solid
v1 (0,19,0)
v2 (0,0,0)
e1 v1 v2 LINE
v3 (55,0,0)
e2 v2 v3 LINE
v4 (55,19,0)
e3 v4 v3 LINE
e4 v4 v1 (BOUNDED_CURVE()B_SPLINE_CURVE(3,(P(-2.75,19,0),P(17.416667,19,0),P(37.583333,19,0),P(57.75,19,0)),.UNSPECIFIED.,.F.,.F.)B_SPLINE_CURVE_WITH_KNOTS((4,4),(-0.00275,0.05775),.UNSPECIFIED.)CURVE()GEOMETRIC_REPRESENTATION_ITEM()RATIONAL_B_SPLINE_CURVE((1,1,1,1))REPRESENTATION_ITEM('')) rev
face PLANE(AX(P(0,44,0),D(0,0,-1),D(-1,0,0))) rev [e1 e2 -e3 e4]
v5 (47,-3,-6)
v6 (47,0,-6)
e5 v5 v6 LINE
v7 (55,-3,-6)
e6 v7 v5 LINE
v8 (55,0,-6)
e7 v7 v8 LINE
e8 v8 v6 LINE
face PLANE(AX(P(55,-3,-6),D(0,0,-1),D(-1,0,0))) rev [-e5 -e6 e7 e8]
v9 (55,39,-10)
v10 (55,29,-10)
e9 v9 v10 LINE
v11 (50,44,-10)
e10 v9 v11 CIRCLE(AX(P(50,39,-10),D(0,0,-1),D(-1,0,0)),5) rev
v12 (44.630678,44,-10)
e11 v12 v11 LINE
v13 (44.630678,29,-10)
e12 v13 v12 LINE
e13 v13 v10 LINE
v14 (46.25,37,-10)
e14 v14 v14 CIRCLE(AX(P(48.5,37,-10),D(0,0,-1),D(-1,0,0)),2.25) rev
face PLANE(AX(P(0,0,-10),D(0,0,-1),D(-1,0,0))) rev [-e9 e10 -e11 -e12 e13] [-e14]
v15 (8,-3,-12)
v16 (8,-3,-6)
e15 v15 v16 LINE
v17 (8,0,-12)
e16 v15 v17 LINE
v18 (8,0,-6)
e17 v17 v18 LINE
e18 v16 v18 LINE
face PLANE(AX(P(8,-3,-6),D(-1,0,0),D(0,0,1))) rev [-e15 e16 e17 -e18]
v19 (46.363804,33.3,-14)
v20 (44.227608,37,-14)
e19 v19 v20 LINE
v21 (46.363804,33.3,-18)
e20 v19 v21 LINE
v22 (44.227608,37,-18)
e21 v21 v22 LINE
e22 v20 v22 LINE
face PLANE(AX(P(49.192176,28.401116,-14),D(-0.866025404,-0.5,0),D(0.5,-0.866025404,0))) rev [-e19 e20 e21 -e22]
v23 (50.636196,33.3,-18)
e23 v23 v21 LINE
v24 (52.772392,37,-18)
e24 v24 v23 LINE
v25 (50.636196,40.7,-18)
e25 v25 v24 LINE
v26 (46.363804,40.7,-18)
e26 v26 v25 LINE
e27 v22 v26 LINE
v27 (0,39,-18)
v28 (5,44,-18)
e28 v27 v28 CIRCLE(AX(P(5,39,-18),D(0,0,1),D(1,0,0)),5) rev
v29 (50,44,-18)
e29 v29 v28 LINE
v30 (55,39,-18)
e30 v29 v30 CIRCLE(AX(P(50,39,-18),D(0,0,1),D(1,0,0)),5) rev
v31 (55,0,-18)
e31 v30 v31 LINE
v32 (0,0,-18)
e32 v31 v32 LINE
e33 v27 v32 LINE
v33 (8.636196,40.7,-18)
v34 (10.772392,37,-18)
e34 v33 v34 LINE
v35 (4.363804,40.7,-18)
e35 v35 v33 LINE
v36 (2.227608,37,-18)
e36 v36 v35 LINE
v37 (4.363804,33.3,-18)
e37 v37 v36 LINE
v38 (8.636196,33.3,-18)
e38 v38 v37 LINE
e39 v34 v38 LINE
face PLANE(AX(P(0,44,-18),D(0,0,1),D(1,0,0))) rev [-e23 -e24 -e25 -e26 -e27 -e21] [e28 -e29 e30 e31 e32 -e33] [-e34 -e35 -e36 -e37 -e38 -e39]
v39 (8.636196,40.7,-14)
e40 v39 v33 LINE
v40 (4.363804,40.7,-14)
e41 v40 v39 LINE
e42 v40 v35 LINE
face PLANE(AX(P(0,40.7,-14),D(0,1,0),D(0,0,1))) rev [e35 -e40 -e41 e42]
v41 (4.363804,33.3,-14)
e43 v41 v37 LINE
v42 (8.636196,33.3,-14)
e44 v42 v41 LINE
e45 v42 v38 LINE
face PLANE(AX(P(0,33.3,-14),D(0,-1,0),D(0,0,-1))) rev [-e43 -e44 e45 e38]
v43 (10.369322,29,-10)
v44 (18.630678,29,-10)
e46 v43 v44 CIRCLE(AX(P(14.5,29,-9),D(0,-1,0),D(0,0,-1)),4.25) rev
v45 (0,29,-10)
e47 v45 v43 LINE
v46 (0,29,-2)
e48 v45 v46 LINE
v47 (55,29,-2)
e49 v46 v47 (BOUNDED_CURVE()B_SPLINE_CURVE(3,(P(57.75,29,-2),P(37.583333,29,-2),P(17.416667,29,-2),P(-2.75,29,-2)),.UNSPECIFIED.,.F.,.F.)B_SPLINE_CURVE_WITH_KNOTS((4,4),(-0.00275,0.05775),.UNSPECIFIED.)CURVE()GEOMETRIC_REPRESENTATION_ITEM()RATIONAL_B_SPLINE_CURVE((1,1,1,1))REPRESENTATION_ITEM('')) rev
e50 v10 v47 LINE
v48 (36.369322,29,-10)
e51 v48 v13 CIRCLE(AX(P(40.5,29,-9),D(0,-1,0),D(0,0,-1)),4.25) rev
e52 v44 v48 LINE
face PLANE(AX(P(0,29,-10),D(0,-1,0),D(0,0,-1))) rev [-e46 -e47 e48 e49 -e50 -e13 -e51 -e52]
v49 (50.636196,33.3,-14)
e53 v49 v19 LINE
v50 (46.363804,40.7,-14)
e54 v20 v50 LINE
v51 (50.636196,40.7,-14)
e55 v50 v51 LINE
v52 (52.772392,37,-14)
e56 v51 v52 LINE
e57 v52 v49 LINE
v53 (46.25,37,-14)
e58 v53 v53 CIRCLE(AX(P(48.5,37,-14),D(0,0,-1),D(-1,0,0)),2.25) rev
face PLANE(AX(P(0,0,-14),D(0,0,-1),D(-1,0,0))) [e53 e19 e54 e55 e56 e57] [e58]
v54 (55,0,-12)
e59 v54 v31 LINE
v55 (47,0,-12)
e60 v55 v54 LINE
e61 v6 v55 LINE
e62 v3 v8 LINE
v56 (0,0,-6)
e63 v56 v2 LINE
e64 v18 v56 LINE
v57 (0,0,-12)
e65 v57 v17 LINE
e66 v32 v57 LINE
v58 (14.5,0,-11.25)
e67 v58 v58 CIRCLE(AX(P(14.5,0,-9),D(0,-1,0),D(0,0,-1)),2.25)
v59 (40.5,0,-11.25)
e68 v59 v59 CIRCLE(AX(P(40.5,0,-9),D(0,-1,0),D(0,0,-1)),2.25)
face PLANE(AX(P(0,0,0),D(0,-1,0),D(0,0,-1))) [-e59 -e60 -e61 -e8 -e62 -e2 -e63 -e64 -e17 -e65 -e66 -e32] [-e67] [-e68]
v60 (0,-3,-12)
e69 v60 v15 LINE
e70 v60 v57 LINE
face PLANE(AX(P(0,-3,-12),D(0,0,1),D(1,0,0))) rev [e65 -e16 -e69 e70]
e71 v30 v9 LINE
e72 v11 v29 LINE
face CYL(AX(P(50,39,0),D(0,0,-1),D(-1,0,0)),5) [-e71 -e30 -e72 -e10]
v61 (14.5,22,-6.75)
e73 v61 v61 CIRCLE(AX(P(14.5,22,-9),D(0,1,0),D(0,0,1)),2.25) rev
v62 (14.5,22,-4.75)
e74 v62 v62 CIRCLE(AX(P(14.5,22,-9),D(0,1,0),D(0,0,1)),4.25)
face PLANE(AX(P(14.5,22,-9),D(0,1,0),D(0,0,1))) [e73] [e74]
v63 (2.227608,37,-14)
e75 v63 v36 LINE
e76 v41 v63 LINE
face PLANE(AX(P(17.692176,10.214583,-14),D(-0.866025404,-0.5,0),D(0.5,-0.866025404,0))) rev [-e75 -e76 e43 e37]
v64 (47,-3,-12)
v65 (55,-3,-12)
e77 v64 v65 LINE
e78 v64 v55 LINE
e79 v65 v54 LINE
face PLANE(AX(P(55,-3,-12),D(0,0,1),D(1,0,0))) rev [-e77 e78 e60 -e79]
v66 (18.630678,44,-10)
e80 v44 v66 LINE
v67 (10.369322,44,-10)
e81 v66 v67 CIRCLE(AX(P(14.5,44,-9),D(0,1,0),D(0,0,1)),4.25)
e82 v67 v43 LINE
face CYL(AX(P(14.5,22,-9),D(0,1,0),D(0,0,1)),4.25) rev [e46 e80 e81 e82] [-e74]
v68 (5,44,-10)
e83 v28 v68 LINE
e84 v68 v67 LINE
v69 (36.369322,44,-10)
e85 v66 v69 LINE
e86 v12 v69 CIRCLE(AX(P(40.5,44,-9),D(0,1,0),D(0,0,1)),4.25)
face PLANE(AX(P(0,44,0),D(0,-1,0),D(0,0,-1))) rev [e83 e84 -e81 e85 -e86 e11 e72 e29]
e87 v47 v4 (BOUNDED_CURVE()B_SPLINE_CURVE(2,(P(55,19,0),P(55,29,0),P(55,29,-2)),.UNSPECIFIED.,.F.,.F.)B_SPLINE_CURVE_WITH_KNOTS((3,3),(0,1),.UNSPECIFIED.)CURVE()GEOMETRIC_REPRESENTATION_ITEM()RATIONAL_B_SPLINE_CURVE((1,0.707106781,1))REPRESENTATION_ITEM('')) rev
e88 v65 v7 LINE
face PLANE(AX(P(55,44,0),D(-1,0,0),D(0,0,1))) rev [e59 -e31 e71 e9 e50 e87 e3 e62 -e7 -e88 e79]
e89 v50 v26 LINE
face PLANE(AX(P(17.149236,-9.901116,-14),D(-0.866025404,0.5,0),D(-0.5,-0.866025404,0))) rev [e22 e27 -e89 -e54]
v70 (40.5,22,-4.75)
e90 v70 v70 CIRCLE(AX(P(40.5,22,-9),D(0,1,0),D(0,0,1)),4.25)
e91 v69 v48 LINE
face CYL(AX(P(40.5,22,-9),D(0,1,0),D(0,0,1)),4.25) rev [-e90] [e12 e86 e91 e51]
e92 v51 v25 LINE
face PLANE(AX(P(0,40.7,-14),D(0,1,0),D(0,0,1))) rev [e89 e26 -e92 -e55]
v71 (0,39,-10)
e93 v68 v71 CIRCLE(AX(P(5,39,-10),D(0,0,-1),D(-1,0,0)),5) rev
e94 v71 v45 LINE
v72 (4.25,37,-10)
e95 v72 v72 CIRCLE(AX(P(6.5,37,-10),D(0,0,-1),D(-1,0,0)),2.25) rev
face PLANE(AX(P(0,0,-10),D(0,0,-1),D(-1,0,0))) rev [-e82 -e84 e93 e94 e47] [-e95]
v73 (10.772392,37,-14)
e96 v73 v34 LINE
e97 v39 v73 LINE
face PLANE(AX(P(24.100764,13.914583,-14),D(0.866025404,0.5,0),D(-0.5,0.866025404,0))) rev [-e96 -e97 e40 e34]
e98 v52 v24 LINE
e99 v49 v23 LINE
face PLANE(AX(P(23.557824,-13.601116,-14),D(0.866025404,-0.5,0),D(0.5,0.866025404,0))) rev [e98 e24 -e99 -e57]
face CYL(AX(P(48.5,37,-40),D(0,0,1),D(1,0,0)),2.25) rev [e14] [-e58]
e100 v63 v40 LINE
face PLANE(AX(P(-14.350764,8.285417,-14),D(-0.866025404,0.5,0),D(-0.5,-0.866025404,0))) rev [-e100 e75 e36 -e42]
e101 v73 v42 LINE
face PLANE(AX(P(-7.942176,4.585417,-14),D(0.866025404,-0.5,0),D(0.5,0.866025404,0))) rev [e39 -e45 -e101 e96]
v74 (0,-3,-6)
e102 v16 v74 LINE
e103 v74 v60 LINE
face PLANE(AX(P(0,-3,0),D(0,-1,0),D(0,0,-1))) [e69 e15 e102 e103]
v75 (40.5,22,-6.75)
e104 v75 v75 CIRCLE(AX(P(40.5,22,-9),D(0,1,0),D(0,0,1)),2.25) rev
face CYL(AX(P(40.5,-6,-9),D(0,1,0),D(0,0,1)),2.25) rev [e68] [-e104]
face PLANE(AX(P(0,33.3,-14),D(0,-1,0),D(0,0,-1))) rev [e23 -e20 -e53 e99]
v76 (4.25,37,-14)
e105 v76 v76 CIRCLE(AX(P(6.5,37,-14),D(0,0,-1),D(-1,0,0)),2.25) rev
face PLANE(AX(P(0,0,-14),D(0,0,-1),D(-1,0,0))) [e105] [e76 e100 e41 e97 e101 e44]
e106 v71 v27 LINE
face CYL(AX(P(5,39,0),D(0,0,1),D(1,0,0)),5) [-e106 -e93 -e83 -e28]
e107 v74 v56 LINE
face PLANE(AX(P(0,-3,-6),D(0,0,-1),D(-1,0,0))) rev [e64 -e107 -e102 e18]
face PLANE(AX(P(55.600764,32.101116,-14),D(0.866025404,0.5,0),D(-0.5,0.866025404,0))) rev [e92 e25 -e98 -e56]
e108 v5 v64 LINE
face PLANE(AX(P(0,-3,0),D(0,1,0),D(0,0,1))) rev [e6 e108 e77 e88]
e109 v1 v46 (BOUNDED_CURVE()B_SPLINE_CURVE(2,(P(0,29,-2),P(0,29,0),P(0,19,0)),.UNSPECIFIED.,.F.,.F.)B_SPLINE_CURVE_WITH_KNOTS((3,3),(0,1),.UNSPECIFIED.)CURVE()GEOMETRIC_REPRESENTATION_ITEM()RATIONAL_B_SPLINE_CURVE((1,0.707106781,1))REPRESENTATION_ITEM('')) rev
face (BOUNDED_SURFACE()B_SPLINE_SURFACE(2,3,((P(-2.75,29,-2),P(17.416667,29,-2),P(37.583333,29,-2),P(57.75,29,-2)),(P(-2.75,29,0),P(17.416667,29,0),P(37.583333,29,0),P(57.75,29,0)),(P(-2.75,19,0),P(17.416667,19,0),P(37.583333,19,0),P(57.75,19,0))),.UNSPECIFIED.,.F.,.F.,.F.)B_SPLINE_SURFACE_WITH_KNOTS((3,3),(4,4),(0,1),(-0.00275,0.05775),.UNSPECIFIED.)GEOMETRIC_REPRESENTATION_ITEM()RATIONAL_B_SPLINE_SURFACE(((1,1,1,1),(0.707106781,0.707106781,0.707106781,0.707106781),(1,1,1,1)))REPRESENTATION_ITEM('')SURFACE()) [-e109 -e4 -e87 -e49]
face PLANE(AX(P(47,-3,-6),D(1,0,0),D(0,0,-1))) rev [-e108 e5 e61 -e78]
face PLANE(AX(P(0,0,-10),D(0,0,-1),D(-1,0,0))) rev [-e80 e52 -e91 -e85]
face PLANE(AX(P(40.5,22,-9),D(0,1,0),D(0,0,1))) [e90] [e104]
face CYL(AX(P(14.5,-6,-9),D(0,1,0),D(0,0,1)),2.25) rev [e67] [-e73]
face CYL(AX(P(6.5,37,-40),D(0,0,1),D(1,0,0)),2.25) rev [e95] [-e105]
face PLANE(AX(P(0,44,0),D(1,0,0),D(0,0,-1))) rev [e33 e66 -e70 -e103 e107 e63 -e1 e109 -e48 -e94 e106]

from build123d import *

# Parameters (mm, degrees)
SKETCH_1_W          = 55
SKETCH_1_H          = 18
EXTRUDE_1_DEPTH     = 44
SKETCH_2_R          = 2.25
CUT_EXTRUDE_1_DEPTH = 40
SKETCH_3_R          = 2.25
CUT_EXTRUDE_2_DEPTH = 50
SKETCH_4_R          = 4.25
CUT_EXTRUDE_3_DEPTH = 22
CUT_EXTRUDE_START   = -4
SKETCH_5_R          = 2.25
CUT_EXTRUDE_4_DEPTH = 4
FILLET_1_R          = 5
SKETCH_6_W          = 8
SKETCH_6_H          = 6
EXTRUDE_2_DEPTH     = 3
SKETCH_7_W          = 71.435921238
SKETCH_7_H          = 28.786378212
CUT_EXTRUDE_5_DEPTH = 10
FILLET_2_SIZE       = 10
FILLET_2_SIZE_2     = 2


with BuildPart() as part:
    # Эскиз1 → Бобышка-Вытянуть1 (new body)
    with BuildSketch(Plane(origin=(0, 0, 0), x_dir=(1, 0, 0), z_dir=(0, 1, 0))):
        with Locations((27.5, 9)):
            Rectangle(SKETCH_1_W, SKETCH_1_H)
    extrude(amount=EXTRUDE_1_DEPTH)

    # Эскиз2 → Вырез-Вытянуть1 (cut)
    with BuildSketch(Plane.XY):
        with Locations((48.5, 37)):
            Circle(SKETCH_2_R)
        with Locations((6.5, 37)):
            Circle(SKETCH_2_R)
    extrude(amount=-CUT_EXTRUDE_1_DEPTH, mode=Mode.SUBTRACT)

    # Эскиз3 → Вырез-Вытянуть2 (cut)
    with BuildSketch(Plane(origin=(0, 44, 0), x_dir=(1, 0, 0), z_dir=(0, 1, 0))):
        with Locations(Location((40.5, 9, 0), (0, 0, 270))):
            Circle(SKETCH_3_R)
        with Locations(Location((14.5, 9, 0), (0, 0, 90))):
            Circle(SKETCH_3_R)
    extrude(amount=-CUT_EXTRUDE_2_DEPTH, mode=Mode.SUBTRACT)

    # Эскиз4 → Вырез-Вытянуть3 (cut)
    with BuildSketch(Plane(origin=(0, 44, 0), x_dir=(1, 0, 0), z_dir=(0, 1, 0))):
        with Locations(Location((40.5, 9, 0), (0, 0, 270))):
            Circle(SKETCH_4_R)
        with Locations(Location((14.5, 9, 0), (0, 0, 270))):
            Circle(SKETCH_4_R)
    extrude(amount=-CUT_EXTRUDE_3_DEPTH, mode=Mode.SUBTRACT)

    # Эскиз5 → Вырез-Вытянуть4 (cut)
    # profile 1 of 2: a face of its own
    with BuildSketch(Plane(origin=(0, 0, -18), x_dir=(-1, 0, 0), z_dir=(0, 0, -1)).offset(CUT_EXTRUDE_START)):
        Polygon((-52.772391992, 37), (-50.636195996, 33.3), (-46.363804004, 33.3), (-44.227608008, 37), (-46.363804004, 40.7), (-50.636195996, 40.7), align=None)
        with Locations((-48.5, 37)):
            Circle(SKETCH_5_R, mode=Mode.SUBTRACT)
    # profile 2 of 2: a face of its own
    with BuildSketch(Plane(origin=(0, 0, -18), x_dir=(-1, 0, 0), z_dir=(0, 0, -1)).offset(CUT_EXTRUDE_START)):
        Polygon((-10.772391992, 37), (-8.636195996, 33.3), (-4.363804004, 33.3), (-2.227608008, 37), (-4.363804004, 40.7), (-8.636195996, 40.7), align=None)
        with Locations(Location((-6.5, 37, 0), (0, 0, 180))):
            Circle(SKETCH_5_R, mode=Mode.SUBTRACT)
    extrude(amount=CUT_EXTRUDE_4_DEPTH, mode=Mode.SUBTRACT)

    # Скругление1
    fillet_1_edges = [part.edges().sort_by_distance(p)[0] for p in [
        (55, 44, -9),
        (0, 44, -9),
    ]]
    fillet(fillet_1_edges, radius=FILLET_1_R)

    # Эскиз6 → Бобышка-Вытянуть2 (add)
    with BuildSketch(Plane.XZ):
        with Locations((51, -9)):
            Rectangle(SKETCH_6_W, SKETCH_6_H)
        with Locations((4, -9)):
            Rectangle(SKETCH_6_W, SKETCH_6_H)
    extrude(amount=EXTRUDE_2_DEPTH)

    # Эскиз7 → Вырез-Вытянуть5 (cut)
    with BuildSketch(Plane.XY):
        with Locations((35.717960619, 43.393189106)):
            Rectangle(SKETCH_7_W, SKETCH_7_H)
    extrude(amount=-CUT_EXTRUDE_5_DEPTH, mode=Mode.SUBTRACT)

    # Скругление2
    # an asymmetric fillet: 10, 2 mm, written as the material it takes off along each edge
    with BuildSketch(Plane(origin=(-25, 29, 0), x_dir=(0, -1, 0), z_dir=(1, 0, 0))) as fillet_2_piece_1:
        with BuildLine():
            Bezier((FILLET_2_SIZE, 0), (0, 0), (0, FILLET_2_SIZE_2), weights=[1, 0.707106781, 1])
            Line((0, FILLET_2_SIZE_2), (0, 0))
            Line((0, 0), (FILLET_2_SIZE, 0))
        make_face()
    extrude(amount=105, mode=Mode.SUBTRACT)


solid = part.part
